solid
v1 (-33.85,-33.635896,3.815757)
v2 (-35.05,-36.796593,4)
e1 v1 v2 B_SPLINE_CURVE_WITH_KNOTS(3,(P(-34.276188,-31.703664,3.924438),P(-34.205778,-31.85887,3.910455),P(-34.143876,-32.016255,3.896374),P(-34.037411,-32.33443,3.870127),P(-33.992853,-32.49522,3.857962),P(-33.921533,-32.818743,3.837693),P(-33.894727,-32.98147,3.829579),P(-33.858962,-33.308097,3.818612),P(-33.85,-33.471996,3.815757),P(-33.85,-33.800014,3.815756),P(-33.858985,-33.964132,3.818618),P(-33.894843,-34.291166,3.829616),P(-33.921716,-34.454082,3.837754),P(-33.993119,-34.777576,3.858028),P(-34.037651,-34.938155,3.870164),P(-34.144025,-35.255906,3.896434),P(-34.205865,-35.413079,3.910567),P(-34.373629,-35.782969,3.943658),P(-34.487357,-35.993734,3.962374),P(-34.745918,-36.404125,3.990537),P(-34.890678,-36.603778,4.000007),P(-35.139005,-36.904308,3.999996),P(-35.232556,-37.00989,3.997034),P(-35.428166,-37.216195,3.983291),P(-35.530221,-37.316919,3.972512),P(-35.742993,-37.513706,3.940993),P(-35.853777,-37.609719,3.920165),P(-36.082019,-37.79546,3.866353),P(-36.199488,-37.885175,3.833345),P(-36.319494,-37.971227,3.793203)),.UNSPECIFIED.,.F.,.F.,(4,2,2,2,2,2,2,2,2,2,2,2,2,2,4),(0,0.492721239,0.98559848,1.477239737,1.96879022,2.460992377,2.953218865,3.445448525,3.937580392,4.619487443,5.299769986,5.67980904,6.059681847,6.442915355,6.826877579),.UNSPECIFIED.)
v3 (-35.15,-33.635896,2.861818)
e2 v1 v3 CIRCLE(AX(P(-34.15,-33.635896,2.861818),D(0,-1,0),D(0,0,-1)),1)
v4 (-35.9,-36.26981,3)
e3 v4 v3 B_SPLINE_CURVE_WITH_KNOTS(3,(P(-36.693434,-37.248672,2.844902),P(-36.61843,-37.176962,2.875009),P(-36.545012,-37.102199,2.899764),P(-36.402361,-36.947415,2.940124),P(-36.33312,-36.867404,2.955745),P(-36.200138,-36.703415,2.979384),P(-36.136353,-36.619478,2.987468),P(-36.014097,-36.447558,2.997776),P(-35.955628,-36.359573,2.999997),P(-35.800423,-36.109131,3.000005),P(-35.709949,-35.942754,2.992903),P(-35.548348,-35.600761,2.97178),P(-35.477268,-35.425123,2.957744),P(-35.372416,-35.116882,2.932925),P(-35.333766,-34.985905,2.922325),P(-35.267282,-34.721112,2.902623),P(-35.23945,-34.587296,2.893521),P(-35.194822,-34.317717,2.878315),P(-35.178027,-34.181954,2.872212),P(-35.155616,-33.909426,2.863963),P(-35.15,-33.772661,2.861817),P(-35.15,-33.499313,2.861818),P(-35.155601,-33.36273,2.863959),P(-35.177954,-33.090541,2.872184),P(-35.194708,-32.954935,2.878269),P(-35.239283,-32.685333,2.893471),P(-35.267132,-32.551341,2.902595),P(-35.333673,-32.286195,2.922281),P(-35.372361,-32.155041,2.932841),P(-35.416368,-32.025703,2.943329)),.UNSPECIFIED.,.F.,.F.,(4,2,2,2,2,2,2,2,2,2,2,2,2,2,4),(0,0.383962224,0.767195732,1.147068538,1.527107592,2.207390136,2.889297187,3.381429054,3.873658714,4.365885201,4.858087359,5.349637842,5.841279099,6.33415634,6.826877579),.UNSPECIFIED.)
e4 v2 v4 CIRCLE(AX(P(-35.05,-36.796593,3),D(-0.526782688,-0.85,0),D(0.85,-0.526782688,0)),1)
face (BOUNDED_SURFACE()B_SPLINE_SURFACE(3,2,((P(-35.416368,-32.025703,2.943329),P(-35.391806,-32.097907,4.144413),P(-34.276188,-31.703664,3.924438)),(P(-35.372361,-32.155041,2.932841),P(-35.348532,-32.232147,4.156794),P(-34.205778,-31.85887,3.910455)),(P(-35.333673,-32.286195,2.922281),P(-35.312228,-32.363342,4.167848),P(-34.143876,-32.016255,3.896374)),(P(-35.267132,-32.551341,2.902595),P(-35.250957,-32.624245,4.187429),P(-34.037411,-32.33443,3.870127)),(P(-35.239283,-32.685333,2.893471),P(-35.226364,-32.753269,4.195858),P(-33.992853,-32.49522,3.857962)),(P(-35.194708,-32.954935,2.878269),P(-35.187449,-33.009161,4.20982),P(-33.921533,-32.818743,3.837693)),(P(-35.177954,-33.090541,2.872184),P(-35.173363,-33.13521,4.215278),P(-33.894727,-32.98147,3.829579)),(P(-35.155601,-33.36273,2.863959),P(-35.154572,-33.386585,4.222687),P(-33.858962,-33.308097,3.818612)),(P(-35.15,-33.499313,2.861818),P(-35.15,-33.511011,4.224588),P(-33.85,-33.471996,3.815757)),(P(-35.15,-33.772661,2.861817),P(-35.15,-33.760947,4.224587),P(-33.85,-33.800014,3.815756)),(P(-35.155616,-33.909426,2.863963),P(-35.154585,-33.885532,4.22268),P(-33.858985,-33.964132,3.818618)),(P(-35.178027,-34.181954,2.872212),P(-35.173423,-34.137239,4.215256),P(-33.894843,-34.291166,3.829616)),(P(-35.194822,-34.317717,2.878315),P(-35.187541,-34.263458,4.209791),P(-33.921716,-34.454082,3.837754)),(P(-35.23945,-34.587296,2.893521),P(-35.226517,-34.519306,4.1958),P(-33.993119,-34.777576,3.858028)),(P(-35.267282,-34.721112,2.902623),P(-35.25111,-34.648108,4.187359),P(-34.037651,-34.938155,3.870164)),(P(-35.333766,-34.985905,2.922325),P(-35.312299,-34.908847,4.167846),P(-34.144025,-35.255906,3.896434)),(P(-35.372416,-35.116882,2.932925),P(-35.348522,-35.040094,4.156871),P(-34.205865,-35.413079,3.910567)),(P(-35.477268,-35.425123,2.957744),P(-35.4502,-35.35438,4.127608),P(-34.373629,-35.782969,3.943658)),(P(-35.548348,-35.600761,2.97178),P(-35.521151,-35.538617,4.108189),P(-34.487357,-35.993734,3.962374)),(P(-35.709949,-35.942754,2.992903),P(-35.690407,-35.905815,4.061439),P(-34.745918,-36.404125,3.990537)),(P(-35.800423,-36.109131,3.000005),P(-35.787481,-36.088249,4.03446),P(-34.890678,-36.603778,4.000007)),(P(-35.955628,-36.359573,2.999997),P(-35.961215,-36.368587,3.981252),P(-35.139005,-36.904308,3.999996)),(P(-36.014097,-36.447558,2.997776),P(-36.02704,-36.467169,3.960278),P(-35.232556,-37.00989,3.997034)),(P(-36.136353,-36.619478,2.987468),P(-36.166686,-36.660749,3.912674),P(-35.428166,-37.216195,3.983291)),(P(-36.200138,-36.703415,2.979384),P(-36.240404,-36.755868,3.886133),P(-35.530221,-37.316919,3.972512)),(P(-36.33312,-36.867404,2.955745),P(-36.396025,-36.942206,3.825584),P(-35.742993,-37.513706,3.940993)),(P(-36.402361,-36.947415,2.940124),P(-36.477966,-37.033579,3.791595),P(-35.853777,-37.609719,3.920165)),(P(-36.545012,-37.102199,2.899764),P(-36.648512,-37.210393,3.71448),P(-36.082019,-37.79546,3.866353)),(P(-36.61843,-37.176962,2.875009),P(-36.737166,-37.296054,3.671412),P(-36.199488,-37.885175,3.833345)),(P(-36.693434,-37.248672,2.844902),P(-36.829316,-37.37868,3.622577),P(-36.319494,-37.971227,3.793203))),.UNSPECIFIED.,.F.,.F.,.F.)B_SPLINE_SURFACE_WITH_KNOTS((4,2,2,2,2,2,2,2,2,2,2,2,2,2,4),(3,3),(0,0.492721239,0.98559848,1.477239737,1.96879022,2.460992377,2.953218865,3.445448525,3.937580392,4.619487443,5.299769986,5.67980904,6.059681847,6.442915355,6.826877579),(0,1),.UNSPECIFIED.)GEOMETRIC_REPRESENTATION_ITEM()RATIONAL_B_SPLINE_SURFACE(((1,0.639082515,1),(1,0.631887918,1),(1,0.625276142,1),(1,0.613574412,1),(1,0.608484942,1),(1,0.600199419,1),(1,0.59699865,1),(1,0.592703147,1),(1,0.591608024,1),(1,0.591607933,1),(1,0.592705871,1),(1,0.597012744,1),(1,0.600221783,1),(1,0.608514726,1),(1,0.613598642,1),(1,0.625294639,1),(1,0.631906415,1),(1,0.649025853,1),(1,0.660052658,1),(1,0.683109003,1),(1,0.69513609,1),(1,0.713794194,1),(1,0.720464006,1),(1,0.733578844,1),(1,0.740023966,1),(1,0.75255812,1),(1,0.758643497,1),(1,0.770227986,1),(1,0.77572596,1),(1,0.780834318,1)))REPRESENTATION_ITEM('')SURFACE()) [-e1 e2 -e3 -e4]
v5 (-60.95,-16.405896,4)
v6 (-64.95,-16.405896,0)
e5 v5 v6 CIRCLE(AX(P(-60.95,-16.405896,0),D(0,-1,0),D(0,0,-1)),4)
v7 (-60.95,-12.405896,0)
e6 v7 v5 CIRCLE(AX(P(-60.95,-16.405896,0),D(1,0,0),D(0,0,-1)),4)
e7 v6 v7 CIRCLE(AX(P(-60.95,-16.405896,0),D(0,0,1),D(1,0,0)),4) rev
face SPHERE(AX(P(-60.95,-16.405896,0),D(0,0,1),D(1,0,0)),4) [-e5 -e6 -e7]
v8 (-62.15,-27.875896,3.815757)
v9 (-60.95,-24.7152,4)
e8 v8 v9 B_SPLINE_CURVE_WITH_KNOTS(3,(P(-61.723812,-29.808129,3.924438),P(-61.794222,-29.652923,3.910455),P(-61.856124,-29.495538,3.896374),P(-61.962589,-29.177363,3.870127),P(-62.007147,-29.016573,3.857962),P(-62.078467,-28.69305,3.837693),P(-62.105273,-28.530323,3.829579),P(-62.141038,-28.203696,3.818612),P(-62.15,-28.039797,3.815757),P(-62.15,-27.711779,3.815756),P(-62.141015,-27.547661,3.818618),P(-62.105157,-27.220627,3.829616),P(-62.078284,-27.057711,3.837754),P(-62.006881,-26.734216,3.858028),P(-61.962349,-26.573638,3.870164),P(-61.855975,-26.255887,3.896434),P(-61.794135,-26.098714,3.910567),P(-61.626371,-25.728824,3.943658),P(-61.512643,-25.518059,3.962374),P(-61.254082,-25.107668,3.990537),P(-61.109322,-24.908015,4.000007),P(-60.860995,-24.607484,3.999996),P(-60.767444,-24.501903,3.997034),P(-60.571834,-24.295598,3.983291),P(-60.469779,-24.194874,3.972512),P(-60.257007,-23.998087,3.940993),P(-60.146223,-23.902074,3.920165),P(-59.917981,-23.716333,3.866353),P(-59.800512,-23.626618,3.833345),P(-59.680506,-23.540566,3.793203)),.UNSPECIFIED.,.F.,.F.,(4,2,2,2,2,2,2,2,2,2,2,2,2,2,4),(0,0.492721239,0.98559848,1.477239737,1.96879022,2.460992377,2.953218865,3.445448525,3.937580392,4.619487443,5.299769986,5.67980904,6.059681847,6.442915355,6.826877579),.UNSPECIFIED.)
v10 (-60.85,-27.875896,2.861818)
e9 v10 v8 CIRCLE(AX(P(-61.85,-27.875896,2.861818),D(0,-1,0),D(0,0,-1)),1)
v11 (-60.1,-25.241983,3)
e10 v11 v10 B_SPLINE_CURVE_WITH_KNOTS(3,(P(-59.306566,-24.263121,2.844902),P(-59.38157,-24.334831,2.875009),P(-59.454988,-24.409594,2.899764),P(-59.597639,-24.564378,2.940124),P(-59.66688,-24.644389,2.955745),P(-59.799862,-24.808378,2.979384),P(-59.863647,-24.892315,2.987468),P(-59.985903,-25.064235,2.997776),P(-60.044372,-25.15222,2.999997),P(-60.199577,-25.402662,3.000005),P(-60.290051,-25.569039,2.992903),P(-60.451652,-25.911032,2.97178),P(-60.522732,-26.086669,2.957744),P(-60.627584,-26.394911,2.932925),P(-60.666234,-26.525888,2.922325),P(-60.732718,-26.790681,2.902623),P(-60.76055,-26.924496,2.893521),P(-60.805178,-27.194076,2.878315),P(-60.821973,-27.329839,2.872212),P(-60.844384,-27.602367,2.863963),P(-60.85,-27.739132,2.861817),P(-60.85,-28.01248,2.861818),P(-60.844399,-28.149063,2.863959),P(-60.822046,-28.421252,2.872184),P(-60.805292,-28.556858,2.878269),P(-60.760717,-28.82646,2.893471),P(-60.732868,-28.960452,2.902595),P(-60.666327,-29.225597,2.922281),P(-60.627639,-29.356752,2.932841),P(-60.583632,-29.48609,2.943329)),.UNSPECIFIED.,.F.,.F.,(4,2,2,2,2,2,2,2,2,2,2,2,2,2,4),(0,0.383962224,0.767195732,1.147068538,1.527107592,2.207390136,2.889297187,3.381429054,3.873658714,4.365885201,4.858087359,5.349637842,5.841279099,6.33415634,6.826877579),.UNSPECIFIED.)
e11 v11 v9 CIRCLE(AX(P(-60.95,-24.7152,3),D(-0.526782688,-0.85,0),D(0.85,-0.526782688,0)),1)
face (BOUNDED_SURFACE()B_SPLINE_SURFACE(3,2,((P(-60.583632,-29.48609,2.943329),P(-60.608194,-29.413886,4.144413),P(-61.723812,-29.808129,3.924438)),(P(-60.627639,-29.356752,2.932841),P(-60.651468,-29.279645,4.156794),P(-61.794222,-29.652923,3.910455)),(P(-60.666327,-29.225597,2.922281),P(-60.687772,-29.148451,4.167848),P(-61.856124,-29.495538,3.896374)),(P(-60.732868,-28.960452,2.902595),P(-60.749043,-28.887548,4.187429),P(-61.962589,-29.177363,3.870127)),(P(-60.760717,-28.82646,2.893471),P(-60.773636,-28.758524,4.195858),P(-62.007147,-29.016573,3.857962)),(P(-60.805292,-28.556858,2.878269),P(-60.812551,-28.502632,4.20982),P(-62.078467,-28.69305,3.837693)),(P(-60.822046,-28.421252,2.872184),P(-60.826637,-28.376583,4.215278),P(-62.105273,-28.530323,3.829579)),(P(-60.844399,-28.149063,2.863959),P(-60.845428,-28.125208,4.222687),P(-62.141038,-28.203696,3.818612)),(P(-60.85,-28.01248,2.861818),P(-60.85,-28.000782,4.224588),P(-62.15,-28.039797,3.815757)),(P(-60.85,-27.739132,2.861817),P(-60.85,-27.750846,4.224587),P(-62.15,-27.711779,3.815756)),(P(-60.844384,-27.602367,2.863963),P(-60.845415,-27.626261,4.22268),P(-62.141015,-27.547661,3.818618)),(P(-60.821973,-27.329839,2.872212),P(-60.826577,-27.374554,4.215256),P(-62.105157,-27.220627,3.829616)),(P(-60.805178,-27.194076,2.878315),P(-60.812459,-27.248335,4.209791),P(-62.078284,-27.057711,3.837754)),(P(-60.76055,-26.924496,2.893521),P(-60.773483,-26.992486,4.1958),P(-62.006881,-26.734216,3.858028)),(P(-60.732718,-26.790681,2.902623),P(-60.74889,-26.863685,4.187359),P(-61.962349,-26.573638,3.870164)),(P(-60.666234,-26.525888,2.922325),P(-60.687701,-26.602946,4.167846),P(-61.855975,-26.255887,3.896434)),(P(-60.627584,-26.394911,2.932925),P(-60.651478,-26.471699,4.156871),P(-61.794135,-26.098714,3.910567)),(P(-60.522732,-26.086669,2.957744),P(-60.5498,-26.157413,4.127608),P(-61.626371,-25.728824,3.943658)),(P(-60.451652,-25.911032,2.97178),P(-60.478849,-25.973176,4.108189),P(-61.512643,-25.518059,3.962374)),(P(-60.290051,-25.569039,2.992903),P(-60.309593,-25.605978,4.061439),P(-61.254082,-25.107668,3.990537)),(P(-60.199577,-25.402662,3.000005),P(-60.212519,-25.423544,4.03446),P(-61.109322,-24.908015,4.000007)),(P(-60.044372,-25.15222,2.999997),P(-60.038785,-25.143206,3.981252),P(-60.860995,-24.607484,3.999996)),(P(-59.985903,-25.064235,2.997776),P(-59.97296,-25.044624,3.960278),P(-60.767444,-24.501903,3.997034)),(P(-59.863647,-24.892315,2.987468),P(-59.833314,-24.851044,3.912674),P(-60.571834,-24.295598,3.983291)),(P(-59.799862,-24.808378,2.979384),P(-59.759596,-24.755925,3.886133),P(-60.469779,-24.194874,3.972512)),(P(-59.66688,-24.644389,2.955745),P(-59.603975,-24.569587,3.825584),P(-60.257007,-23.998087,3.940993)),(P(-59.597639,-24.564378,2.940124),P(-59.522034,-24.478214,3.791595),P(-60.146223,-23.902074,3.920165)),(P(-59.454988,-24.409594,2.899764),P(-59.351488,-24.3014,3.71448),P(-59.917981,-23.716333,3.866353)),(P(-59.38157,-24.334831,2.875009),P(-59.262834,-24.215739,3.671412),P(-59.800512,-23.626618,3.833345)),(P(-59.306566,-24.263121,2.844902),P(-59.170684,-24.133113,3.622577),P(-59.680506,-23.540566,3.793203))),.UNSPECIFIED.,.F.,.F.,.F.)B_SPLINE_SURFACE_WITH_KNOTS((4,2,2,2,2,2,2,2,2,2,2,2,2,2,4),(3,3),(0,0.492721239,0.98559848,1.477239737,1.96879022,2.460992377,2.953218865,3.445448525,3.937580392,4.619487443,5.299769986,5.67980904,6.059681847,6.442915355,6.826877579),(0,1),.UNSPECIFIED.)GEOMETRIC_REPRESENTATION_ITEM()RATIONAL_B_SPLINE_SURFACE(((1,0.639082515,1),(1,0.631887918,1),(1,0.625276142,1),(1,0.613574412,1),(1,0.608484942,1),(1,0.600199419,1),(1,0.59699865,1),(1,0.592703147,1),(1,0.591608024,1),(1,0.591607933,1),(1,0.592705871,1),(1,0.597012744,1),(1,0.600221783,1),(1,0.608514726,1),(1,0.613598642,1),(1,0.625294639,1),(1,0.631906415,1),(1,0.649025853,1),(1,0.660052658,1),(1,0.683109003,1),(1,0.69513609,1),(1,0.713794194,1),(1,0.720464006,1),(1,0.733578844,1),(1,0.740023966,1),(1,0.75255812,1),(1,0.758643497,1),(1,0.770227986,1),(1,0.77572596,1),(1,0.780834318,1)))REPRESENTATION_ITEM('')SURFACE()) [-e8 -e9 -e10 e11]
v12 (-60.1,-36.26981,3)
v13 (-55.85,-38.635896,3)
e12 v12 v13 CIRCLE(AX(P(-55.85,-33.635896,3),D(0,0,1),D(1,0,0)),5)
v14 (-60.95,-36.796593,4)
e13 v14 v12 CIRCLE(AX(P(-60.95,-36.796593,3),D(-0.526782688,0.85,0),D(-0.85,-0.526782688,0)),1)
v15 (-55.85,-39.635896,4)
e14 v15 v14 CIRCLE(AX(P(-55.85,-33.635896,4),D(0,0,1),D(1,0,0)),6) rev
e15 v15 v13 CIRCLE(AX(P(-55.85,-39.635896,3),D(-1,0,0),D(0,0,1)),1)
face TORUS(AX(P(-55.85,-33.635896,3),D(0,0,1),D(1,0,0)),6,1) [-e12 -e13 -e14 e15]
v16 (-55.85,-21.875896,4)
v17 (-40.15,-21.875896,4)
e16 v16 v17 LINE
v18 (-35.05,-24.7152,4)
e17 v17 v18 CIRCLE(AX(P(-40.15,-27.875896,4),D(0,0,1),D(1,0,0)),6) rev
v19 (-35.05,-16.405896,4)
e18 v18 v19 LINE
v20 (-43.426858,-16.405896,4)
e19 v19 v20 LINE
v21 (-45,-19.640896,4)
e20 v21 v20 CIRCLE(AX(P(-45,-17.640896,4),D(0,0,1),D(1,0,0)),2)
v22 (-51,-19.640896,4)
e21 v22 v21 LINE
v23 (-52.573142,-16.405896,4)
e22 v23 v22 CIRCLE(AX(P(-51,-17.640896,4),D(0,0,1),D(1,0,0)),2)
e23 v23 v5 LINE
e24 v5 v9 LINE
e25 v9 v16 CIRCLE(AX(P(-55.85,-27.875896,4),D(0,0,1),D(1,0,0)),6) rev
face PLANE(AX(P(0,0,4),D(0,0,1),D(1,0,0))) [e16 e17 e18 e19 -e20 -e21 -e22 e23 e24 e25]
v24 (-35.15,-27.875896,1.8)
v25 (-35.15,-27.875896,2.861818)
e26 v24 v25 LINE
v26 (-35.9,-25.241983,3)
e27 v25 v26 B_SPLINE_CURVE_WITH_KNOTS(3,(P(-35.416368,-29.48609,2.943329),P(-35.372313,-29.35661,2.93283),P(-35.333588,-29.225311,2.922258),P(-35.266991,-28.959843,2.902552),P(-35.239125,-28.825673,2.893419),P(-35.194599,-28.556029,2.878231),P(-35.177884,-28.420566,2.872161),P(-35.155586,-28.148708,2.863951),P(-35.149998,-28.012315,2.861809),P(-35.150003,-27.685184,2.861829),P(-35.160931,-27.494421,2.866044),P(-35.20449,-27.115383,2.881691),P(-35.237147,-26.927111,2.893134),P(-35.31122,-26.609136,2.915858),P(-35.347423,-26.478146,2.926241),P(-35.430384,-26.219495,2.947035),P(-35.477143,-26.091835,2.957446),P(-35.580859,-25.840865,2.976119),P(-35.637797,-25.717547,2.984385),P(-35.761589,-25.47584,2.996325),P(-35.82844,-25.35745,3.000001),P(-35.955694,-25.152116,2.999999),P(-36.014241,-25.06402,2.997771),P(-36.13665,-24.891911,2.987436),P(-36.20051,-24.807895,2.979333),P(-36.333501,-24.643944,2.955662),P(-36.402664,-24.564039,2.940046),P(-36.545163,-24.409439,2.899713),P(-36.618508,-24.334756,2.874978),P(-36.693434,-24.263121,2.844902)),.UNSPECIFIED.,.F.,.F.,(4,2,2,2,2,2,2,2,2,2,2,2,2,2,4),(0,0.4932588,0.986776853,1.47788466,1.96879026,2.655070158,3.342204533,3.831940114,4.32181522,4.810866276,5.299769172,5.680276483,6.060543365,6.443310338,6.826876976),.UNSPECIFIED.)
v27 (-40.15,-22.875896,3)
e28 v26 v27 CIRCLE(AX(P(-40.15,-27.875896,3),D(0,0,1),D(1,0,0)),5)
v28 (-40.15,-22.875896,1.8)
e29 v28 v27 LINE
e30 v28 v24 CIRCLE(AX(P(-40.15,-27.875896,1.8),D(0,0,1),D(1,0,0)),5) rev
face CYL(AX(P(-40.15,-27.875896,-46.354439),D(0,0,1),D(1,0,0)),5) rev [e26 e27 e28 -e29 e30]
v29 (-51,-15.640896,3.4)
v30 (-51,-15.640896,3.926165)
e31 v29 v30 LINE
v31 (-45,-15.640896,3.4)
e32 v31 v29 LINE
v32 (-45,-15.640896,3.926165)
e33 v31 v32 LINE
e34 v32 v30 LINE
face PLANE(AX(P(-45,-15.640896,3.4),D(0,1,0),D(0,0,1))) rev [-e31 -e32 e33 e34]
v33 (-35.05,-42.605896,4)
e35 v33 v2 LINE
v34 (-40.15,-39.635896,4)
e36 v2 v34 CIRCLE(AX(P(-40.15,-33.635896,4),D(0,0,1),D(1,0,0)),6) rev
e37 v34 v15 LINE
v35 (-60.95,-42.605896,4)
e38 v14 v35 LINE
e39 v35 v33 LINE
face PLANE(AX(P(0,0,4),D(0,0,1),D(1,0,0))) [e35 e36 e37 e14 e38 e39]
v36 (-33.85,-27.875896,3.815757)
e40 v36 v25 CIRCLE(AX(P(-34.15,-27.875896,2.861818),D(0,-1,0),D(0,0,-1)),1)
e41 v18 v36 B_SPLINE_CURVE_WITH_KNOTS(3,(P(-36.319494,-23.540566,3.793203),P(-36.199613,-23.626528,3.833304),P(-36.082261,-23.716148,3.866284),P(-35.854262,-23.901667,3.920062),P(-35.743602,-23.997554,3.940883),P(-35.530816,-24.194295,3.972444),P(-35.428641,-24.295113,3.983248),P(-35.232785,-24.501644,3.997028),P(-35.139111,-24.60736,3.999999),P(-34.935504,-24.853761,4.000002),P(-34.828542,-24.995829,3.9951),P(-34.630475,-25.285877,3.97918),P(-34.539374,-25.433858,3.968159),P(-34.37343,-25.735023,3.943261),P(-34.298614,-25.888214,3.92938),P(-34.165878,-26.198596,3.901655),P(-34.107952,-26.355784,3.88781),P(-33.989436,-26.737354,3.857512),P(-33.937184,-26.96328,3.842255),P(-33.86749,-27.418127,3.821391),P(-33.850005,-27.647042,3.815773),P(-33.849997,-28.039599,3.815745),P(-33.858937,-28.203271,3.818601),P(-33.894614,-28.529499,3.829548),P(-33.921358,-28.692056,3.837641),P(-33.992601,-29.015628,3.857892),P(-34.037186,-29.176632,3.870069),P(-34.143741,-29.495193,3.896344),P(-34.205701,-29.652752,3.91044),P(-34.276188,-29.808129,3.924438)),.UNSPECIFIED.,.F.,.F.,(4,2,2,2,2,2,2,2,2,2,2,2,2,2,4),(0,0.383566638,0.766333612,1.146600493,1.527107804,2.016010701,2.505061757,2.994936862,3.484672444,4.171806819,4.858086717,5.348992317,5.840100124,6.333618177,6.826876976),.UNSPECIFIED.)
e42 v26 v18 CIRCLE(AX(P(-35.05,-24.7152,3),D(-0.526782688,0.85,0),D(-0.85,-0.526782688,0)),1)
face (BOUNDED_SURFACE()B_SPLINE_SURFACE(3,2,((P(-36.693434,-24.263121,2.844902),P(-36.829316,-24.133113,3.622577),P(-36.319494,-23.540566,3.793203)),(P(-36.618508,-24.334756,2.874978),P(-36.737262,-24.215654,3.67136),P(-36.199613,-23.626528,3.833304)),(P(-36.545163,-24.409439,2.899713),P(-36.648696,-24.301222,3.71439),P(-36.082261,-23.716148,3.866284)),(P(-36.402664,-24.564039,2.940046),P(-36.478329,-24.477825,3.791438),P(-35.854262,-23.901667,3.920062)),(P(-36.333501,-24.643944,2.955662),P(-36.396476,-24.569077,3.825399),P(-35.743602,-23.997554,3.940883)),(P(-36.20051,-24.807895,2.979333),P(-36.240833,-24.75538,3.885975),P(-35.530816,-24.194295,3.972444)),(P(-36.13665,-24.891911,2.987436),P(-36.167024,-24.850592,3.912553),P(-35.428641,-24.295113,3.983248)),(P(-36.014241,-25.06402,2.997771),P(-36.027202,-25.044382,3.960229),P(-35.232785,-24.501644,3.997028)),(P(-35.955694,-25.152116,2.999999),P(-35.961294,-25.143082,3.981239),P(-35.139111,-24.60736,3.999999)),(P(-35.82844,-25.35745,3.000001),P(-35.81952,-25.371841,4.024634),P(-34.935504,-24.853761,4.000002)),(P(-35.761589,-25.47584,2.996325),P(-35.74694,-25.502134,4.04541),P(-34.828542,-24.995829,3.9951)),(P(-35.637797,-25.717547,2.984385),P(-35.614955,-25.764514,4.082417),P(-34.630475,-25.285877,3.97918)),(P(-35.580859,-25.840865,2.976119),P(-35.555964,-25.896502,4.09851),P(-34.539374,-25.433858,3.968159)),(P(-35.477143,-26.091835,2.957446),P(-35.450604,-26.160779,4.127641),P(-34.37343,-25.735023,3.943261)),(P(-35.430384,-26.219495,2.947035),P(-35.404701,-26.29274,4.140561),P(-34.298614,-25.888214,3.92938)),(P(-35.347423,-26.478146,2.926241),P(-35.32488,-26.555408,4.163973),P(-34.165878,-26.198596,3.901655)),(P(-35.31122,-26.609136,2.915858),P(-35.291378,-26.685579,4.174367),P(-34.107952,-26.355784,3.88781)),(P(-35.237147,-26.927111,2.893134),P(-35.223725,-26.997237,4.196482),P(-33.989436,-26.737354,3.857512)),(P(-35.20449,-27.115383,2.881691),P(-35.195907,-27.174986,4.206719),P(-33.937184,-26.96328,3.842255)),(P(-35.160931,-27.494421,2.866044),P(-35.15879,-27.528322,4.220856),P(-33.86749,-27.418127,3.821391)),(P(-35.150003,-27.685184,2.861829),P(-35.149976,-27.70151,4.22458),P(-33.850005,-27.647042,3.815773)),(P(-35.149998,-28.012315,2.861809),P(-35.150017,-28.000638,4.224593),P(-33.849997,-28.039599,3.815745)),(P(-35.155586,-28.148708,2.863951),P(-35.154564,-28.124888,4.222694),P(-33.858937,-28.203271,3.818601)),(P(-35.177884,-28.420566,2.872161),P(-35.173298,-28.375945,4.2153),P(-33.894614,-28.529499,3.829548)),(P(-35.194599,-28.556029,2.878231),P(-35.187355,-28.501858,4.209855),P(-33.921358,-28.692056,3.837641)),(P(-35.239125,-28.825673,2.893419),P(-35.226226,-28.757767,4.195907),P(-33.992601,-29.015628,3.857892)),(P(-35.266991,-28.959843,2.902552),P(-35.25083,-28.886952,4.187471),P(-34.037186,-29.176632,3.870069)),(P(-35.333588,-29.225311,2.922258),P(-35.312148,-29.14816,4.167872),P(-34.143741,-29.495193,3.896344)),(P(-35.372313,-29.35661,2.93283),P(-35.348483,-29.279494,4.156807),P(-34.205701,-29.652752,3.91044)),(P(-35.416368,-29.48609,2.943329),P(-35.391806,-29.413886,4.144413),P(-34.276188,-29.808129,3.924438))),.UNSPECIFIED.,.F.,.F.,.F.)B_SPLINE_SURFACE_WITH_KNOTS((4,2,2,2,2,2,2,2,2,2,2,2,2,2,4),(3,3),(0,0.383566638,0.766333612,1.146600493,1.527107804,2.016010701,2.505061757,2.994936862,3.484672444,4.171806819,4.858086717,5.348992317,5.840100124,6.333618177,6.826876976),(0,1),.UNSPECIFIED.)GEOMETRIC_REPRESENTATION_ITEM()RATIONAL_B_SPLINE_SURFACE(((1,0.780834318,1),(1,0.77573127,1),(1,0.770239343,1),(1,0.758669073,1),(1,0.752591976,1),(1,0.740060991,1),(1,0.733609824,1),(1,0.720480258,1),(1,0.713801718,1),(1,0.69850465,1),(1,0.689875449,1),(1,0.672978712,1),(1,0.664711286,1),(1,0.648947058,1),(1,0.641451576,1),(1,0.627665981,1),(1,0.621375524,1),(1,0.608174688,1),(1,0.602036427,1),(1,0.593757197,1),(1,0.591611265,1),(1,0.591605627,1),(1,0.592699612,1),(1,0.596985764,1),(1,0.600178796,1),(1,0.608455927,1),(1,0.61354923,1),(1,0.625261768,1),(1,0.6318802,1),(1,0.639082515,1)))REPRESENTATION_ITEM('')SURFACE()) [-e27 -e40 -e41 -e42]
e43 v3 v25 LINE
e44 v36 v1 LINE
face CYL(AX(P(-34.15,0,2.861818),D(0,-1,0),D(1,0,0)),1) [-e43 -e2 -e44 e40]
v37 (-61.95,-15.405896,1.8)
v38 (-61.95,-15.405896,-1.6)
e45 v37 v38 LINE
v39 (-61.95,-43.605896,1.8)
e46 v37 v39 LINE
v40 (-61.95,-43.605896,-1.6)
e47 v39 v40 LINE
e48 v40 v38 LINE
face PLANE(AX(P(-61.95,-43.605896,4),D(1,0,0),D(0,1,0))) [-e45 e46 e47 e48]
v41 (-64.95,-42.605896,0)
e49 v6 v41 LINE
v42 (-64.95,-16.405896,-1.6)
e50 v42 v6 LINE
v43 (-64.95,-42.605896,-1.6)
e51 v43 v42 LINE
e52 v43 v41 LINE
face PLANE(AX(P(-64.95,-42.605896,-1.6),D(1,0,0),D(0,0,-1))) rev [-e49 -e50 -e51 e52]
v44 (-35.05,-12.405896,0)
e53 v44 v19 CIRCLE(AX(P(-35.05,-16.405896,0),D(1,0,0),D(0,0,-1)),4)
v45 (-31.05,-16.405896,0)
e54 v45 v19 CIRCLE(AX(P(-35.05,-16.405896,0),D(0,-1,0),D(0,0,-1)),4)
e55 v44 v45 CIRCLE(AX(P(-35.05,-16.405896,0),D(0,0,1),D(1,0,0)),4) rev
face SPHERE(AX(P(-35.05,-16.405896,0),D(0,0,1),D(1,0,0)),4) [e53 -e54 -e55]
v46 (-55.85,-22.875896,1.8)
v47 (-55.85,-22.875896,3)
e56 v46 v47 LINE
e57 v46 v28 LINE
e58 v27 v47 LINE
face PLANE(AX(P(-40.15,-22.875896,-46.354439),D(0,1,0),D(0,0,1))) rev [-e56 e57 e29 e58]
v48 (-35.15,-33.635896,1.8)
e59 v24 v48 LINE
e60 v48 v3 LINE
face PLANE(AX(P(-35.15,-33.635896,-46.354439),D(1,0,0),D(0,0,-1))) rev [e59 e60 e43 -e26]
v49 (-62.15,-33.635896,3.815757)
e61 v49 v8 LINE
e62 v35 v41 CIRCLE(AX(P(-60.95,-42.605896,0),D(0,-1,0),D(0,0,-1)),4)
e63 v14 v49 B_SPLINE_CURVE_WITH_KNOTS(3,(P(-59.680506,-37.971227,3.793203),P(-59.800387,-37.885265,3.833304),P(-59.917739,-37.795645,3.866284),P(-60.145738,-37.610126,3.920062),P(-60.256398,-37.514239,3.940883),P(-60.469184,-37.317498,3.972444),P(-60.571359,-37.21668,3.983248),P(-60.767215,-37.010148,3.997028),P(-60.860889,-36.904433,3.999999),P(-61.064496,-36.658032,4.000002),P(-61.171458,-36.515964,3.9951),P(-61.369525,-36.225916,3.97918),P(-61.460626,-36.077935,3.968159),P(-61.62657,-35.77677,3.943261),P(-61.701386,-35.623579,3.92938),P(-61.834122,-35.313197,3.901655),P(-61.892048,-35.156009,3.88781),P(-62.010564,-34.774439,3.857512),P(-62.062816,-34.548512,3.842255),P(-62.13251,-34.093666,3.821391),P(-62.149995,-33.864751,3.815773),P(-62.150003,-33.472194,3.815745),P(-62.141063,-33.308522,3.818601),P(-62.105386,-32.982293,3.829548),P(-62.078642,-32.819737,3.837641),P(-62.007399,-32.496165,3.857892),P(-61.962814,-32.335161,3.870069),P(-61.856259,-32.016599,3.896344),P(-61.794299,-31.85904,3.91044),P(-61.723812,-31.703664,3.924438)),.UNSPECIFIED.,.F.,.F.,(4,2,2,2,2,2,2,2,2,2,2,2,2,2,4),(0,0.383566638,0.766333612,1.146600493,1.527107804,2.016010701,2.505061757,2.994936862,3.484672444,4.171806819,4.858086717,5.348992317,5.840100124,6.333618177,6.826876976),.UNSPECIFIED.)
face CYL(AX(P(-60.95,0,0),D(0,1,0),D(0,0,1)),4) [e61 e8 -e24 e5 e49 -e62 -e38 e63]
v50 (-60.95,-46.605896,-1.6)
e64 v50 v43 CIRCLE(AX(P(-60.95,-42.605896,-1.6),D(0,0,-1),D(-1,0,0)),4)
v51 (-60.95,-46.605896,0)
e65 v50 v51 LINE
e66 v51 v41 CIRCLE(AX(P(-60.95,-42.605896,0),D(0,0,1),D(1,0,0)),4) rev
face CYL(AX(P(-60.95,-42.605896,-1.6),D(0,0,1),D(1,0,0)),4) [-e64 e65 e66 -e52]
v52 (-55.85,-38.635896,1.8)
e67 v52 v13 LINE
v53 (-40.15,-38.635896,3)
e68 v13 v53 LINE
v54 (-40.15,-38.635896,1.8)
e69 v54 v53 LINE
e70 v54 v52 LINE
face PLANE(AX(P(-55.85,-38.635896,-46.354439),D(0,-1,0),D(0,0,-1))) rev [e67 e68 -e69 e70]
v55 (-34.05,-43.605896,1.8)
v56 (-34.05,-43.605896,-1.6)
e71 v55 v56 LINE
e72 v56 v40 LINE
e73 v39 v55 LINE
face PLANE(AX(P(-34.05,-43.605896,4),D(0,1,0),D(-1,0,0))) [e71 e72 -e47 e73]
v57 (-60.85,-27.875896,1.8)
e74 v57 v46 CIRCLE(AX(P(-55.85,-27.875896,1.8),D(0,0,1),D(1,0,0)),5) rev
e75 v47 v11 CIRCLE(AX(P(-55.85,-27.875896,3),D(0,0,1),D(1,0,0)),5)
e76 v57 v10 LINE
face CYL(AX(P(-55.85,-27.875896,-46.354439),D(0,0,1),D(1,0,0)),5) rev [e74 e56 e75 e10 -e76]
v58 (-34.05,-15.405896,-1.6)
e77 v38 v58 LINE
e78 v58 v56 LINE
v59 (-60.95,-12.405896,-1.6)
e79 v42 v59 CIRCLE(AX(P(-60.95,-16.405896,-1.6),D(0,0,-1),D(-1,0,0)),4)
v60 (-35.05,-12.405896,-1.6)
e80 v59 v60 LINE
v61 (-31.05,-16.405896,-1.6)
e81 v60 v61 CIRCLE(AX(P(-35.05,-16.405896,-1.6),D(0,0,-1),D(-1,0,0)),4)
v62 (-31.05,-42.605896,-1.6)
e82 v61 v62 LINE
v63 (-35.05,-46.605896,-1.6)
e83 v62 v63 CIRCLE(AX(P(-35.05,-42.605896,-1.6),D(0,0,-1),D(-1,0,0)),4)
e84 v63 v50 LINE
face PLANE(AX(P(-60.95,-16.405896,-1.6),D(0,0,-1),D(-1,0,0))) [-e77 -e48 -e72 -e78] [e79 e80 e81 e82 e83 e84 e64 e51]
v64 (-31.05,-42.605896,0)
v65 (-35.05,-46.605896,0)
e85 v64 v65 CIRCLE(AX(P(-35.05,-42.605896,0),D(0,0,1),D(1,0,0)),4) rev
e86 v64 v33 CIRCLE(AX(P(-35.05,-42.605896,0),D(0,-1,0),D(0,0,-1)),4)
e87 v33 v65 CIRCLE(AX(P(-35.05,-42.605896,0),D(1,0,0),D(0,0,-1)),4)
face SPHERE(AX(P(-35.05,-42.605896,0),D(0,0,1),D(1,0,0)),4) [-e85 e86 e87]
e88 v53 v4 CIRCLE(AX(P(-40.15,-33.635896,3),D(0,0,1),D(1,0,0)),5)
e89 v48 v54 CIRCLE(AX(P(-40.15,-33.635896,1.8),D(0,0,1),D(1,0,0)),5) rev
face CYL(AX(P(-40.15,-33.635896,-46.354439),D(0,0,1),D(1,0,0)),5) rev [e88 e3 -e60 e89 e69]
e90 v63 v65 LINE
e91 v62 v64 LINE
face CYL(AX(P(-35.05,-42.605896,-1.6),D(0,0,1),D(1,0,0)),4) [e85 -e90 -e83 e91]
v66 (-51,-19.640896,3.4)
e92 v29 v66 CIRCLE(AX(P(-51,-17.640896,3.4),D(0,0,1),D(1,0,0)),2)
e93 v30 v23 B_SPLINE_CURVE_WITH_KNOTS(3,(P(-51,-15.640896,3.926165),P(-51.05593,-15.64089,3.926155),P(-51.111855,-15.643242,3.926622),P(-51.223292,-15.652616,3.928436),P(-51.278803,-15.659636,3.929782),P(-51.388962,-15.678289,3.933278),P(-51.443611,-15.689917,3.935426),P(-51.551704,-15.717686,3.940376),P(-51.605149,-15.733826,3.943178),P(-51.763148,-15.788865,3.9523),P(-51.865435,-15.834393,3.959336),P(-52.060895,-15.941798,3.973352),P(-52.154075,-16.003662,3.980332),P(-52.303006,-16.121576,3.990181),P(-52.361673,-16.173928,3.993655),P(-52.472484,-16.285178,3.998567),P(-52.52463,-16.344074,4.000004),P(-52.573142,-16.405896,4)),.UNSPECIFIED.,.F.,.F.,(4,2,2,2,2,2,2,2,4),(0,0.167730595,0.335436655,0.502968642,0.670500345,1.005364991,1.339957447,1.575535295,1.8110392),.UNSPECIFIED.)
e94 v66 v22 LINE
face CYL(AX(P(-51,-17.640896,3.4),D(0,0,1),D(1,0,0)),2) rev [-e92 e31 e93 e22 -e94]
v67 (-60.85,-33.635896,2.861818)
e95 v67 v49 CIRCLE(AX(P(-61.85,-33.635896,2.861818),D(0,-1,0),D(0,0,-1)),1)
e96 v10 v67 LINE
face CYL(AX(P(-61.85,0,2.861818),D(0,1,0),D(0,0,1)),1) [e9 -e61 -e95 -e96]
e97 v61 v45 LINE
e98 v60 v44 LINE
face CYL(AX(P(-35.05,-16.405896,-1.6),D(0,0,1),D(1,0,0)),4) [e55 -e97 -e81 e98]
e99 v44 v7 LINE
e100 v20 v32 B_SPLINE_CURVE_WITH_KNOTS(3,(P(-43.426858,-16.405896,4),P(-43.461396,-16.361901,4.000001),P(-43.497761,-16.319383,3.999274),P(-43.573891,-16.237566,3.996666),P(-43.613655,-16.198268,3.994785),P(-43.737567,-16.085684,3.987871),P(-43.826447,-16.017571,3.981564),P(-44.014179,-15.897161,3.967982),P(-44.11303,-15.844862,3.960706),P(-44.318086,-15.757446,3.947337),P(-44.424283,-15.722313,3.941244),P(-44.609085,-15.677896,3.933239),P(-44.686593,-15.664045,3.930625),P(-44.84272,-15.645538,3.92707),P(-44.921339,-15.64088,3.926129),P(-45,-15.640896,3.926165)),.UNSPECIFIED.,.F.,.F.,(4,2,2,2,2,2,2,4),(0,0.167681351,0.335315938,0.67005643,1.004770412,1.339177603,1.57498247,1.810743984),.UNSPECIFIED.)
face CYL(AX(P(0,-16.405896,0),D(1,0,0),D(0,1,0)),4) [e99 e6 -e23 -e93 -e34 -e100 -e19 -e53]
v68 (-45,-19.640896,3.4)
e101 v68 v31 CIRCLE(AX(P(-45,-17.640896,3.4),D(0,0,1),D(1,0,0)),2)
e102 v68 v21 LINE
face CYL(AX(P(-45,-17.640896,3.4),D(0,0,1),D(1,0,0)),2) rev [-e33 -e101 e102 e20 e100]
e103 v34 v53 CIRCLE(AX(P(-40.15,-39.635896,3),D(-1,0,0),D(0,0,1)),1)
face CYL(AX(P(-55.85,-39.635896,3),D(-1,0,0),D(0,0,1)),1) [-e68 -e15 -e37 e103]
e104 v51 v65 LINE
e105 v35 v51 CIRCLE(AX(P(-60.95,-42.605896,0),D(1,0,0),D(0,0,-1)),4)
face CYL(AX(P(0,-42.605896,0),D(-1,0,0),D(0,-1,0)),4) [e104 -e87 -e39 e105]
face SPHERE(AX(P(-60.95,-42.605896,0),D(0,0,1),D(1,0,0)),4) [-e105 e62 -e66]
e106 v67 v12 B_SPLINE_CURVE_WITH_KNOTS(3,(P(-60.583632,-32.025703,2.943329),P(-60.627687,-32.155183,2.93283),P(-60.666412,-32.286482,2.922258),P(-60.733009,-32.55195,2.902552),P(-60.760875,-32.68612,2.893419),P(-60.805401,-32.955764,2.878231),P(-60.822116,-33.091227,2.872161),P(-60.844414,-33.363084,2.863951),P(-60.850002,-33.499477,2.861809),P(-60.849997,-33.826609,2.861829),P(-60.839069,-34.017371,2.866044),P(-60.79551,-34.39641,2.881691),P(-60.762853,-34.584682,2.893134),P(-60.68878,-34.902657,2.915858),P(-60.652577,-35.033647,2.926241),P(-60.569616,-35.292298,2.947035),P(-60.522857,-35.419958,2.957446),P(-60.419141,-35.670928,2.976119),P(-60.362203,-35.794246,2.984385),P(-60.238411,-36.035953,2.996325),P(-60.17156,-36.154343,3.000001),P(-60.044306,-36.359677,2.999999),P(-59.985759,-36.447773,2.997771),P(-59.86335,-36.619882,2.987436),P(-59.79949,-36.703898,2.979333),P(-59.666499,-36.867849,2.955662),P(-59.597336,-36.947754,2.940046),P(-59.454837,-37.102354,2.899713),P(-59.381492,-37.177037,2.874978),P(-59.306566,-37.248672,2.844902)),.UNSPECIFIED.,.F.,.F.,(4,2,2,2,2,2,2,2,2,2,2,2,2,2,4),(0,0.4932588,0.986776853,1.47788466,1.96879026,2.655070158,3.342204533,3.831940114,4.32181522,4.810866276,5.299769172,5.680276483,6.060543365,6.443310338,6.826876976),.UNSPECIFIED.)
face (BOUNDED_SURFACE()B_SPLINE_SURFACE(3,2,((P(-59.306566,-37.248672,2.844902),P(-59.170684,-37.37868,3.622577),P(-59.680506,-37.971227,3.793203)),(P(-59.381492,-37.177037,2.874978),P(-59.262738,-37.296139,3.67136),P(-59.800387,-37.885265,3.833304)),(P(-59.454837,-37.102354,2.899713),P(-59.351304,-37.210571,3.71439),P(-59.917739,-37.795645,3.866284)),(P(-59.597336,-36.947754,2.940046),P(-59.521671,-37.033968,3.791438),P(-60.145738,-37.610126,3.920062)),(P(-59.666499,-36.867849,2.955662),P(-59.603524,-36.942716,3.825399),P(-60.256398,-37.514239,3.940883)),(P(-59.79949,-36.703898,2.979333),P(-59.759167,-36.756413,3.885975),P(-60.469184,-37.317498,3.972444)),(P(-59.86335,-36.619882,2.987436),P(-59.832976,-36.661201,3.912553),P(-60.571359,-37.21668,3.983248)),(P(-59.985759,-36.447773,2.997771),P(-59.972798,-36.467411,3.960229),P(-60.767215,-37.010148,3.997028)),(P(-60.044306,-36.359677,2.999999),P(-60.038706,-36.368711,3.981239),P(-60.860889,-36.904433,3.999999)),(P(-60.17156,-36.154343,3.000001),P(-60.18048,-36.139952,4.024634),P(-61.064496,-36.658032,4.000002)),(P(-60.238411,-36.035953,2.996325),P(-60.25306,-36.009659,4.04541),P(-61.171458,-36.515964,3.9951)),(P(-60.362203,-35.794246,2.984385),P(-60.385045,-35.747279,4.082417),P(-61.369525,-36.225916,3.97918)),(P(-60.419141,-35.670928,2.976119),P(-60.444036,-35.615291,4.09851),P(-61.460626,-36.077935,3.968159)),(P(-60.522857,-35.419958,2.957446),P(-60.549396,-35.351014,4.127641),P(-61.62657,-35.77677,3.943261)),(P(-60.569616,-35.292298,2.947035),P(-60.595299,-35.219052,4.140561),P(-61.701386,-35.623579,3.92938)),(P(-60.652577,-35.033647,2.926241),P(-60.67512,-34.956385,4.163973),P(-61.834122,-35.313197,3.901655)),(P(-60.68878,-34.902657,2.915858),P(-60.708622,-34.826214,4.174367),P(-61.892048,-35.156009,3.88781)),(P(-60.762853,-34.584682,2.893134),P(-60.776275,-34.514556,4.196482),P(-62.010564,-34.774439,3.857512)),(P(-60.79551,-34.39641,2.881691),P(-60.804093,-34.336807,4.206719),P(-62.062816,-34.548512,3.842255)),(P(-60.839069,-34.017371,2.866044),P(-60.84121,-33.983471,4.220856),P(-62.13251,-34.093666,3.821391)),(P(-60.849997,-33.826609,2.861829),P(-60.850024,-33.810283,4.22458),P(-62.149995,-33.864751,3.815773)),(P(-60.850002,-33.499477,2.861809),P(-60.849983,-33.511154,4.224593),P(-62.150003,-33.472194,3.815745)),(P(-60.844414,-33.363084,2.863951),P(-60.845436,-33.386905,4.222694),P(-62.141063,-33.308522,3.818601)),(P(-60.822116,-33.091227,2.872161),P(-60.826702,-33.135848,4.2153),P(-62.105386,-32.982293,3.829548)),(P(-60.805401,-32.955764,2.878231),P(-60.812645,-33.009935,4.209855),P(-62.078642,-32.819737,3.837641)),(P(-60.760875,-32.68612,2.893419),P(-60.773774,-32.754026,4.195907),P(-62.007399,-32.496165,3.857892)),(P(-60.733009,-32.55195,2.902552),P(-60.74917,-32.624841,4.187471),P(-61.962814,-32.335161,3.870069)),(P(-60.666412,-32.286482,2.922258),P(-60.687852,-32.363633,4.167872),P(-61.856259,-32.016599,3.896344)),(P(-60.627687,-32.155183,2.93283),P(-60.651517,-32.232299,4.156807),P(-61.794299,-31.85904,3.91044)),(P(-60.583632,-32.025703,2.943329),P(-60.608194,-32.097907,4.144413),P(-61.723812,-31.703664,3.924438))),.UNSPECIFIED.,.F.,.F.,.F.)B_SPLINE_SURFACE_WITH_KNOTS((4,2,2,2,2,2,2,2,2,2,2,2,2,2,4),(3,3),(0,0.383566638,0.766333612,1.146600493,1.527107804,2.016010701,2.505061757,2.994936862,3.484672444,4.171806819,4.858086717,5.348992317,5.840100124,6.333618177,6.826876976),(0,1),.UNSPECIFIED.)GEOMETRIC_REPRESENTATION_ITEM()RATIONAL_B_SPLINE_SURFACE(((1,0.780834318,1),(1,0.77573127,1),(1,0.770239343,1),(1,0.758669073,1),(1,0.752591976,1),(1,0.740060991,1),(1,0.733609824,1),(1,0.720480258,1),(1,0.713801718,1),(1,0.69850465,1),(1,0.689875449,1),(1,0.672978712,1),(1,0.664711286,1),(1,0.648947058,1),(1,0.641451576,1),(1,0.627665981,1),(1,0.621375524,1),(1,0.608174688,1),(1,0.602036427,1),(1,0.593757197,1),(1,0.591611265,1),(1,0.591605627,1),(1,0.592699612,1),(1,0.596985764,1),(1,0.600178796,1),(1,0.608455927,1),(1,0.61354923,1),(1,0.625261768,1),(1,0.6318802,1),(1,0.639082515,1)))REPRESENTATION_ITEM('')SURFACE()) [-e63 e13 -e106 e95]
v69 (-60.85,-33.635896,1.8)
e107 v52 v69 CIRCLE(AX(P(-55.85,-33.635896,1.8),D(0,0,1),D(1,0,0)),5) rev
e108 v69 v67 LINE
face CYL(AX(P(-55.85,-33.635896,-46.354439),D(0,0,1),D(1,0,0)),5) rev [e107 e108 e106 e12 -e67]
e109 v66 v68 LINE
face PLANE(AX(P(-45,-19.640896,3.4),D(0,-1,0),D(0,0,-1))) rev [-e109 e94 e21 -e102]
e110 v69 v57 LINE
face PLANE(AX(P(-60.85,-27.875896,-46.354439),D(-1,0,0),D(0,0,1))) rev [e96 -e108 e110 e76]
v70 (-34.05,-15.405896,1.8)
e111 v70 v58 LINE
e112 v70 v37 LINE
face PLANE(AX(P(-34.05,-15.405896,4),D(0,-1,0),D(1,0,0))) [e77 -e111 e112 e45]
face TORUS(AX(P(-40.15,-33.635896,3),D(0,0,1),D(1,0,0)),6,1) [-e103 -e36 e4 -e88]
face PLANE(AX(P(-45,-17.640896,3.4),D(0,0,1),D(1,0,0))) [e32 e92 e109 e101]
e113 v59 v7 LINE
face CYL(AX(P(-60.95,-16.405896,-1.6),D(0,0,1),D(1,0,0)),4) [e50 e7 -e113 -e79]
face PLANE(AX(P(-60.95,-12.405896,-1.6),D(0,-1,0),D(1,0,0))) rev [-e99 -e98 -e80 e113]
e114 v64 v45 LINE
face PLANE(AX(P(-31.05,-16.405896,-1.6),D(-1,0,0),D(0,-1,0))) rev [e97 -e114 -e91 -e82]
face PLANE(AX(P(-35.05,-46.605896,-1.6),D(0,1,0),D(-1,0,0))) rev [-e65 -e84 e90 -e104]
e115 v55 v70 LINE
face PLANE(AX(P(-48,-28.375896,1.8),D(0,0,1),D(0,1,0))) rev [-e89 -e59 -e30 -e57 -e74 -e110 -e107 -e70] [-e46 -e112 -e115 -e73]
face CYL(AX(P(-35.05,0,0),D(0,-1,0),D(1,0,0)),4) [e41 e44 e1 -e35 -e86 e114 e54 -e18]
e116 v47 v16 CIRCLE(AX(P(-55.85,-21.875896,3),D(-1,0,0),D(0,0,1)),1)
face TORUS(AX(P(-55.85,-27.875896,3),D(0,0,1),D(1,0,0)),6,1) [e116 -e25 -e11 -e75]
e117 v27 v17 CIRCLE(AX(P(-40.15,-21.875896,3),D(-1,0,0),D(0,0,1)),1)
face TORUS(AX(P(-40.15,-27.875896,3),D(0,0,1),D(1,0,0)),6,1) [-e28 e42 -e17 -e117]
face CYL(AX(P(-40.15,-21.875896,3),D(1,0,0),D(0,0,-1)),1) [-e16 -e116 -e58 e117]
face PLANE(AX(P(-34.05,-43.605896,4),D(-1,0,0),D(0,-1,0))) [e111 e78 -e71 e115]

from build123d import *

# Parameters (mm, degrees)
SKETCH_1_W          = 33.9
SKETCH_1_H          = 34.2
SKETCH_1_W_2        = 27.9
SKETCH_1_H_2        = 28.2
EXTRUDE_1_DEPTH     = 4
SKETCH_2_W          = 33.9
SKETCH_2_H          = 34.2
EXTRUDE_2_DEPTH     = 2.2
FILLET_1_R          = 4
CUT_EXTRUDE_1_DEPTH = 0.6
FILLET_2_R          = 4
SKETCH_4_W          = 27.9
SKETCH_4_H          = 28.2
EXTRUDE_3_DEPTH     = 1.6
FILLET_3_R          = 1


with BuildPart() as part:
    # Эскиз1 → Бобышка-Вытянуть1 (new body)
    with BuildSketch(Plane.XY):
        with Locations((-48, -29.505896468)):
            Rectangle(SKETCH_1_W, SKETCH_1_H)
        with Locations((-48, -29.505896468)):
            Rectangle(SKETCH_1_W_2, SKETCH_1_H_2, mode=Mode.SUBTRACT)
    extrude(amount=EXTRUDE_1_DEPTH)

    # Эскиз2 → Бобышка-Вытянуть2 (add)
    with BuildSketch(Plane.XY.offset(4)):
        with Locations((-48, -29.505896468)):
            Rectangle(SKETCH_2_W, SKETCH_2_H)
        with BuildLine():
            Line((-60.85, -27.875896468), (-60.85, -33.635896468))
            ThreePointArc((-60.85, -33.635896468), (-59.385533906, -37.171430374), (-55.85, -38.635896468))
            Line((-55.85, -38.635896468), (-40.15, -38.635896468))
            ThreePointArc((-40.15, -38.635896468), (-36.614466094, -37.171430374), (-35.15, -33.635896468))
            Line((-35.15, -33.635896468), (-35.15, -27.875896468))
            ThreePointArc((-35.15, -27.875896468), (-36.614466094, -24.340362562), (-40.15, -22.875896468))
            Line((-40.15, -22.875896468), (-55.85, -22.875896468))
            ThreePointArc((-55.85, -22.875896468), (-59.385533906, -24.340362562), (-60.85, -27.875896468))
        make_face(mode=Mode.SUBTRACT)
    extrude(amount=-EXTRUDE_2_DEPTH)

    # Скругление1
    fillet_1_edges = [part.edges().sort_by_distance(p)[0] for p in [
        (-31.05, -46.605896468, 2),
        (-64.95, -46.605896468, 2),
        (-64.95, -12.405896468, 2),
        (-31.05, -12.405896468, 2),
    ]]
    fillet(fillet_1_edges, radius=FILLET_1_R)

    # Эскиз3 → Вырез-Вытянуть1 (cut)
    with BuildSketch(Plane.XY.offset(4)):
        with BuildLine():
            Line((-45, -19.640896468), (-51, -19.640896468))
            ThreePointArc((-51, -19.640896468), (-53, -17.640896468), (-51, -15.640896468))
            Line((-51, -15.640896468), (-45, -15.640896468))
            ThreePointArc((-45, -15.640896468), (-43, -17.640896468), (-45, -19.640896468))
        make_face()
    extrude(amount=-CUT_EXTRUDE_1_DEPTH, mode=Mode.SUBTRACT)

    # Скругление2
    # the kernel refuses this fillet: 4 mm, written as the material it takes off along each edge
    with BuildSketch(Plane(origin=(-35.05, -42.605896468, 4), x_dir=(0, -1, 0), z_dir=(-1, 0, 0))) as fillet_2_piece_1:
        with BuildLine():
            CenterArc((4 - FILLET_2_R, -FILLET_2_R), FILLET_2_R, 0, 90)
            Line((4, -FILLET_2_R), (4, 0))
            Line((4, 0), (4 - FILLET_2_R, 0))
        make_face()
    revolve(axis=Axis((-35.05, -42.605896468, 4), (0, 0, 1)), revolution_arc=90, mode=Mode.SUBTRACT)
    with BuildSketch(Plane(origin=(-60.95, -46.605896468, 4), x_dir=(0, 1, 0), z_dir=(1, 0, 0))) as fillet_2_piece_2:
        with BuildLine():
            CenterArc((FILLET_2_R, -FILLET_2_R), FILLET_2_R, 90, 90)
            Line((0, -FILLET_2_R), (0, 0))
            Line((0, 0), (FILLET_2_R, 0))
        make_face()
    extrude(amount=25.9, mode=Mode.SUBTRACT)
    with BuildSketch(Plane(origin=(-60.95, -42.605896468, 4), x_dir=(-1, 0, 0), z_dir=(0, 1, 0))) as fillet_2_piece_3:
        with BuildLine():
            CenterArc((4 - FILLET_2_R, -FILLET_2_R), FILLET_2_R, 0, 90)
            Line((4, -FILLET_2_R), (4, 0))
            Line((4, 0), (4 - FILLET_2_R, 0))
        make_face()
    revolve(axis=Axis((-60.95, -42.605896468, 4), (0, 0, 1)), revolution_arc=90, mode=Mode.SUBTRACT)
    with BuildSketch(Plane(origin=(-64.95, -16.405896468, 4), x_dir=(1, 0, 0), z_dir=(0, -1, 0)), Plane(origin=(-31.05, -42.605896468, 4), x_dir=(-1, 0, 0), z_dir=(0, 1, 0))) as fillet_2_piece_4:
        with BuildLine():
            CenterArc((FILLET_2_R, -FILLET_2_R), FILLET_2_R, 90, 90)
            Line((0, -FILLET_2_R), (0, 0))
            Line((0, 0), (FILLET_2_R, 0))
        make_face()
    extrude(amount=26.2, mode=Mode.SUBTRACT)
    with BuildSketch(Plane(origin=(-60.95, -16.405896468, 4), x_dir=(0, 1, 0), z_dir=(1, 0, 0))) as fillet_2_piece_5:
        with BuildLine():
            CenterArc((4 - FILLET_2_R, -FILLET_2_R), FILLET_2_R, 0, 90)
            Line((4 - FILLET_2_R, 0), (4, 0))
            Line((4, 0), (4, -FILLET_2_R))
        make_face()
    revolve(axis=Axis((-60.95, -16.405896468, 4), (0, 0, 1)), revolution_arc=90, mode=Mode.SUBTRACT)
    with BuildSketch(Plane(origin=(-35.05, -12.405896468, 4), x_dir=(0, 0, -1), z_dir=(-1, 0, 0))) as fillet_2_piece_6:
        with BuildLine():
            CenterArc((FILLET_2_R, FILLET_2_R), FILLET_2_R, 180, 90)
            Line((0, FILLET_2_R), (0, 0))
            Line((0, 0), (FILLET_2_R, 0))
        make_face()
    extrude(amount=25.9, mode=Mode.SUBTRACT)
    with BuildSketch(Plane(origin=(-35.05, -16.405896468, 4), x_dir=(0, 1, 0), z_dir=(-1, 0, 0))) as fillet_2_piece_7:
        with BuildLine():
            CenterArc((4 - FILLET_2_R, FILLET_2_R), FILLET_2_R, 270, 90)
            Line((4 - FILLET_2_R, 0), (4, 0))
            Line((4, 0), (4, FILLET_2_R))
        make_face()
    revolve(axis=Axis((-35.05, -16.405896468, 4), (0, 0, -1)), revolution_arc=90, mode=Mode.SUBTRACT)

    # Эскиз4 → Бобышка-Вытянуть3 (add)
    with BuildSketch(Plane(origin=(0, 0, 0), x_dir=(-1, 0, 0), z_dir=(0, 0, -1))):
        with BuildLine():
            Line((60.95, -12.405896468), (35.05, -12.405896468))
            ThreePointArc((35.05, -12.405896468), (32.221572875, -13.577469343), (31.05, -16.405896468))
            Line((31.05, -16.405896468), (31.05, -42.605896468))
            ThreePointArc((31.05, -42.605896468), (32.221572875, -45.434323593), (35.05, -46.605896468))
            Line((35.05, -46.605896468), (60.95, -46.605896468))
            ThreePointArc((60.95, -46.605896468), (63.778427125, -45.434323593), (64.95, -42.605896468))
            Line((64.95, -42.605896468), (64.95, -16.405896468))
            ThreePointArc((64.95, -16.405896468), (63.778427125, -13.577469343), (60.95, -12.405896468))
        make_face()
        with Locations((48, -29.505896468)):
            Rectangle(SKETCH_4_W, SKETCH_4_H, mode=Mode.SUBTRACT)
    extrude(amount=EXTRUDE_3_DEPTH)

    # Скругление3
    fillet_3_edges = [part.edges().sort_by_distance(p)[0] for p in [
        (-48, -38.635896468, 4),
        (-36.614466094, -37.171430374, 4),
        (-35.15, -30.755896468, 4),
        (-36.614466094, -24.340362562, 4),
        (-48, -22.875896468, 4),
        (-59.385533906, -24.340362562, 4),
        (-60.85, -30.755896468, 4),
        (-59.385533906, -37.171430374, 4),
    ]]
    fillet(fillet_3_edges, radius=FILLET_3_R)


solid = part.part
